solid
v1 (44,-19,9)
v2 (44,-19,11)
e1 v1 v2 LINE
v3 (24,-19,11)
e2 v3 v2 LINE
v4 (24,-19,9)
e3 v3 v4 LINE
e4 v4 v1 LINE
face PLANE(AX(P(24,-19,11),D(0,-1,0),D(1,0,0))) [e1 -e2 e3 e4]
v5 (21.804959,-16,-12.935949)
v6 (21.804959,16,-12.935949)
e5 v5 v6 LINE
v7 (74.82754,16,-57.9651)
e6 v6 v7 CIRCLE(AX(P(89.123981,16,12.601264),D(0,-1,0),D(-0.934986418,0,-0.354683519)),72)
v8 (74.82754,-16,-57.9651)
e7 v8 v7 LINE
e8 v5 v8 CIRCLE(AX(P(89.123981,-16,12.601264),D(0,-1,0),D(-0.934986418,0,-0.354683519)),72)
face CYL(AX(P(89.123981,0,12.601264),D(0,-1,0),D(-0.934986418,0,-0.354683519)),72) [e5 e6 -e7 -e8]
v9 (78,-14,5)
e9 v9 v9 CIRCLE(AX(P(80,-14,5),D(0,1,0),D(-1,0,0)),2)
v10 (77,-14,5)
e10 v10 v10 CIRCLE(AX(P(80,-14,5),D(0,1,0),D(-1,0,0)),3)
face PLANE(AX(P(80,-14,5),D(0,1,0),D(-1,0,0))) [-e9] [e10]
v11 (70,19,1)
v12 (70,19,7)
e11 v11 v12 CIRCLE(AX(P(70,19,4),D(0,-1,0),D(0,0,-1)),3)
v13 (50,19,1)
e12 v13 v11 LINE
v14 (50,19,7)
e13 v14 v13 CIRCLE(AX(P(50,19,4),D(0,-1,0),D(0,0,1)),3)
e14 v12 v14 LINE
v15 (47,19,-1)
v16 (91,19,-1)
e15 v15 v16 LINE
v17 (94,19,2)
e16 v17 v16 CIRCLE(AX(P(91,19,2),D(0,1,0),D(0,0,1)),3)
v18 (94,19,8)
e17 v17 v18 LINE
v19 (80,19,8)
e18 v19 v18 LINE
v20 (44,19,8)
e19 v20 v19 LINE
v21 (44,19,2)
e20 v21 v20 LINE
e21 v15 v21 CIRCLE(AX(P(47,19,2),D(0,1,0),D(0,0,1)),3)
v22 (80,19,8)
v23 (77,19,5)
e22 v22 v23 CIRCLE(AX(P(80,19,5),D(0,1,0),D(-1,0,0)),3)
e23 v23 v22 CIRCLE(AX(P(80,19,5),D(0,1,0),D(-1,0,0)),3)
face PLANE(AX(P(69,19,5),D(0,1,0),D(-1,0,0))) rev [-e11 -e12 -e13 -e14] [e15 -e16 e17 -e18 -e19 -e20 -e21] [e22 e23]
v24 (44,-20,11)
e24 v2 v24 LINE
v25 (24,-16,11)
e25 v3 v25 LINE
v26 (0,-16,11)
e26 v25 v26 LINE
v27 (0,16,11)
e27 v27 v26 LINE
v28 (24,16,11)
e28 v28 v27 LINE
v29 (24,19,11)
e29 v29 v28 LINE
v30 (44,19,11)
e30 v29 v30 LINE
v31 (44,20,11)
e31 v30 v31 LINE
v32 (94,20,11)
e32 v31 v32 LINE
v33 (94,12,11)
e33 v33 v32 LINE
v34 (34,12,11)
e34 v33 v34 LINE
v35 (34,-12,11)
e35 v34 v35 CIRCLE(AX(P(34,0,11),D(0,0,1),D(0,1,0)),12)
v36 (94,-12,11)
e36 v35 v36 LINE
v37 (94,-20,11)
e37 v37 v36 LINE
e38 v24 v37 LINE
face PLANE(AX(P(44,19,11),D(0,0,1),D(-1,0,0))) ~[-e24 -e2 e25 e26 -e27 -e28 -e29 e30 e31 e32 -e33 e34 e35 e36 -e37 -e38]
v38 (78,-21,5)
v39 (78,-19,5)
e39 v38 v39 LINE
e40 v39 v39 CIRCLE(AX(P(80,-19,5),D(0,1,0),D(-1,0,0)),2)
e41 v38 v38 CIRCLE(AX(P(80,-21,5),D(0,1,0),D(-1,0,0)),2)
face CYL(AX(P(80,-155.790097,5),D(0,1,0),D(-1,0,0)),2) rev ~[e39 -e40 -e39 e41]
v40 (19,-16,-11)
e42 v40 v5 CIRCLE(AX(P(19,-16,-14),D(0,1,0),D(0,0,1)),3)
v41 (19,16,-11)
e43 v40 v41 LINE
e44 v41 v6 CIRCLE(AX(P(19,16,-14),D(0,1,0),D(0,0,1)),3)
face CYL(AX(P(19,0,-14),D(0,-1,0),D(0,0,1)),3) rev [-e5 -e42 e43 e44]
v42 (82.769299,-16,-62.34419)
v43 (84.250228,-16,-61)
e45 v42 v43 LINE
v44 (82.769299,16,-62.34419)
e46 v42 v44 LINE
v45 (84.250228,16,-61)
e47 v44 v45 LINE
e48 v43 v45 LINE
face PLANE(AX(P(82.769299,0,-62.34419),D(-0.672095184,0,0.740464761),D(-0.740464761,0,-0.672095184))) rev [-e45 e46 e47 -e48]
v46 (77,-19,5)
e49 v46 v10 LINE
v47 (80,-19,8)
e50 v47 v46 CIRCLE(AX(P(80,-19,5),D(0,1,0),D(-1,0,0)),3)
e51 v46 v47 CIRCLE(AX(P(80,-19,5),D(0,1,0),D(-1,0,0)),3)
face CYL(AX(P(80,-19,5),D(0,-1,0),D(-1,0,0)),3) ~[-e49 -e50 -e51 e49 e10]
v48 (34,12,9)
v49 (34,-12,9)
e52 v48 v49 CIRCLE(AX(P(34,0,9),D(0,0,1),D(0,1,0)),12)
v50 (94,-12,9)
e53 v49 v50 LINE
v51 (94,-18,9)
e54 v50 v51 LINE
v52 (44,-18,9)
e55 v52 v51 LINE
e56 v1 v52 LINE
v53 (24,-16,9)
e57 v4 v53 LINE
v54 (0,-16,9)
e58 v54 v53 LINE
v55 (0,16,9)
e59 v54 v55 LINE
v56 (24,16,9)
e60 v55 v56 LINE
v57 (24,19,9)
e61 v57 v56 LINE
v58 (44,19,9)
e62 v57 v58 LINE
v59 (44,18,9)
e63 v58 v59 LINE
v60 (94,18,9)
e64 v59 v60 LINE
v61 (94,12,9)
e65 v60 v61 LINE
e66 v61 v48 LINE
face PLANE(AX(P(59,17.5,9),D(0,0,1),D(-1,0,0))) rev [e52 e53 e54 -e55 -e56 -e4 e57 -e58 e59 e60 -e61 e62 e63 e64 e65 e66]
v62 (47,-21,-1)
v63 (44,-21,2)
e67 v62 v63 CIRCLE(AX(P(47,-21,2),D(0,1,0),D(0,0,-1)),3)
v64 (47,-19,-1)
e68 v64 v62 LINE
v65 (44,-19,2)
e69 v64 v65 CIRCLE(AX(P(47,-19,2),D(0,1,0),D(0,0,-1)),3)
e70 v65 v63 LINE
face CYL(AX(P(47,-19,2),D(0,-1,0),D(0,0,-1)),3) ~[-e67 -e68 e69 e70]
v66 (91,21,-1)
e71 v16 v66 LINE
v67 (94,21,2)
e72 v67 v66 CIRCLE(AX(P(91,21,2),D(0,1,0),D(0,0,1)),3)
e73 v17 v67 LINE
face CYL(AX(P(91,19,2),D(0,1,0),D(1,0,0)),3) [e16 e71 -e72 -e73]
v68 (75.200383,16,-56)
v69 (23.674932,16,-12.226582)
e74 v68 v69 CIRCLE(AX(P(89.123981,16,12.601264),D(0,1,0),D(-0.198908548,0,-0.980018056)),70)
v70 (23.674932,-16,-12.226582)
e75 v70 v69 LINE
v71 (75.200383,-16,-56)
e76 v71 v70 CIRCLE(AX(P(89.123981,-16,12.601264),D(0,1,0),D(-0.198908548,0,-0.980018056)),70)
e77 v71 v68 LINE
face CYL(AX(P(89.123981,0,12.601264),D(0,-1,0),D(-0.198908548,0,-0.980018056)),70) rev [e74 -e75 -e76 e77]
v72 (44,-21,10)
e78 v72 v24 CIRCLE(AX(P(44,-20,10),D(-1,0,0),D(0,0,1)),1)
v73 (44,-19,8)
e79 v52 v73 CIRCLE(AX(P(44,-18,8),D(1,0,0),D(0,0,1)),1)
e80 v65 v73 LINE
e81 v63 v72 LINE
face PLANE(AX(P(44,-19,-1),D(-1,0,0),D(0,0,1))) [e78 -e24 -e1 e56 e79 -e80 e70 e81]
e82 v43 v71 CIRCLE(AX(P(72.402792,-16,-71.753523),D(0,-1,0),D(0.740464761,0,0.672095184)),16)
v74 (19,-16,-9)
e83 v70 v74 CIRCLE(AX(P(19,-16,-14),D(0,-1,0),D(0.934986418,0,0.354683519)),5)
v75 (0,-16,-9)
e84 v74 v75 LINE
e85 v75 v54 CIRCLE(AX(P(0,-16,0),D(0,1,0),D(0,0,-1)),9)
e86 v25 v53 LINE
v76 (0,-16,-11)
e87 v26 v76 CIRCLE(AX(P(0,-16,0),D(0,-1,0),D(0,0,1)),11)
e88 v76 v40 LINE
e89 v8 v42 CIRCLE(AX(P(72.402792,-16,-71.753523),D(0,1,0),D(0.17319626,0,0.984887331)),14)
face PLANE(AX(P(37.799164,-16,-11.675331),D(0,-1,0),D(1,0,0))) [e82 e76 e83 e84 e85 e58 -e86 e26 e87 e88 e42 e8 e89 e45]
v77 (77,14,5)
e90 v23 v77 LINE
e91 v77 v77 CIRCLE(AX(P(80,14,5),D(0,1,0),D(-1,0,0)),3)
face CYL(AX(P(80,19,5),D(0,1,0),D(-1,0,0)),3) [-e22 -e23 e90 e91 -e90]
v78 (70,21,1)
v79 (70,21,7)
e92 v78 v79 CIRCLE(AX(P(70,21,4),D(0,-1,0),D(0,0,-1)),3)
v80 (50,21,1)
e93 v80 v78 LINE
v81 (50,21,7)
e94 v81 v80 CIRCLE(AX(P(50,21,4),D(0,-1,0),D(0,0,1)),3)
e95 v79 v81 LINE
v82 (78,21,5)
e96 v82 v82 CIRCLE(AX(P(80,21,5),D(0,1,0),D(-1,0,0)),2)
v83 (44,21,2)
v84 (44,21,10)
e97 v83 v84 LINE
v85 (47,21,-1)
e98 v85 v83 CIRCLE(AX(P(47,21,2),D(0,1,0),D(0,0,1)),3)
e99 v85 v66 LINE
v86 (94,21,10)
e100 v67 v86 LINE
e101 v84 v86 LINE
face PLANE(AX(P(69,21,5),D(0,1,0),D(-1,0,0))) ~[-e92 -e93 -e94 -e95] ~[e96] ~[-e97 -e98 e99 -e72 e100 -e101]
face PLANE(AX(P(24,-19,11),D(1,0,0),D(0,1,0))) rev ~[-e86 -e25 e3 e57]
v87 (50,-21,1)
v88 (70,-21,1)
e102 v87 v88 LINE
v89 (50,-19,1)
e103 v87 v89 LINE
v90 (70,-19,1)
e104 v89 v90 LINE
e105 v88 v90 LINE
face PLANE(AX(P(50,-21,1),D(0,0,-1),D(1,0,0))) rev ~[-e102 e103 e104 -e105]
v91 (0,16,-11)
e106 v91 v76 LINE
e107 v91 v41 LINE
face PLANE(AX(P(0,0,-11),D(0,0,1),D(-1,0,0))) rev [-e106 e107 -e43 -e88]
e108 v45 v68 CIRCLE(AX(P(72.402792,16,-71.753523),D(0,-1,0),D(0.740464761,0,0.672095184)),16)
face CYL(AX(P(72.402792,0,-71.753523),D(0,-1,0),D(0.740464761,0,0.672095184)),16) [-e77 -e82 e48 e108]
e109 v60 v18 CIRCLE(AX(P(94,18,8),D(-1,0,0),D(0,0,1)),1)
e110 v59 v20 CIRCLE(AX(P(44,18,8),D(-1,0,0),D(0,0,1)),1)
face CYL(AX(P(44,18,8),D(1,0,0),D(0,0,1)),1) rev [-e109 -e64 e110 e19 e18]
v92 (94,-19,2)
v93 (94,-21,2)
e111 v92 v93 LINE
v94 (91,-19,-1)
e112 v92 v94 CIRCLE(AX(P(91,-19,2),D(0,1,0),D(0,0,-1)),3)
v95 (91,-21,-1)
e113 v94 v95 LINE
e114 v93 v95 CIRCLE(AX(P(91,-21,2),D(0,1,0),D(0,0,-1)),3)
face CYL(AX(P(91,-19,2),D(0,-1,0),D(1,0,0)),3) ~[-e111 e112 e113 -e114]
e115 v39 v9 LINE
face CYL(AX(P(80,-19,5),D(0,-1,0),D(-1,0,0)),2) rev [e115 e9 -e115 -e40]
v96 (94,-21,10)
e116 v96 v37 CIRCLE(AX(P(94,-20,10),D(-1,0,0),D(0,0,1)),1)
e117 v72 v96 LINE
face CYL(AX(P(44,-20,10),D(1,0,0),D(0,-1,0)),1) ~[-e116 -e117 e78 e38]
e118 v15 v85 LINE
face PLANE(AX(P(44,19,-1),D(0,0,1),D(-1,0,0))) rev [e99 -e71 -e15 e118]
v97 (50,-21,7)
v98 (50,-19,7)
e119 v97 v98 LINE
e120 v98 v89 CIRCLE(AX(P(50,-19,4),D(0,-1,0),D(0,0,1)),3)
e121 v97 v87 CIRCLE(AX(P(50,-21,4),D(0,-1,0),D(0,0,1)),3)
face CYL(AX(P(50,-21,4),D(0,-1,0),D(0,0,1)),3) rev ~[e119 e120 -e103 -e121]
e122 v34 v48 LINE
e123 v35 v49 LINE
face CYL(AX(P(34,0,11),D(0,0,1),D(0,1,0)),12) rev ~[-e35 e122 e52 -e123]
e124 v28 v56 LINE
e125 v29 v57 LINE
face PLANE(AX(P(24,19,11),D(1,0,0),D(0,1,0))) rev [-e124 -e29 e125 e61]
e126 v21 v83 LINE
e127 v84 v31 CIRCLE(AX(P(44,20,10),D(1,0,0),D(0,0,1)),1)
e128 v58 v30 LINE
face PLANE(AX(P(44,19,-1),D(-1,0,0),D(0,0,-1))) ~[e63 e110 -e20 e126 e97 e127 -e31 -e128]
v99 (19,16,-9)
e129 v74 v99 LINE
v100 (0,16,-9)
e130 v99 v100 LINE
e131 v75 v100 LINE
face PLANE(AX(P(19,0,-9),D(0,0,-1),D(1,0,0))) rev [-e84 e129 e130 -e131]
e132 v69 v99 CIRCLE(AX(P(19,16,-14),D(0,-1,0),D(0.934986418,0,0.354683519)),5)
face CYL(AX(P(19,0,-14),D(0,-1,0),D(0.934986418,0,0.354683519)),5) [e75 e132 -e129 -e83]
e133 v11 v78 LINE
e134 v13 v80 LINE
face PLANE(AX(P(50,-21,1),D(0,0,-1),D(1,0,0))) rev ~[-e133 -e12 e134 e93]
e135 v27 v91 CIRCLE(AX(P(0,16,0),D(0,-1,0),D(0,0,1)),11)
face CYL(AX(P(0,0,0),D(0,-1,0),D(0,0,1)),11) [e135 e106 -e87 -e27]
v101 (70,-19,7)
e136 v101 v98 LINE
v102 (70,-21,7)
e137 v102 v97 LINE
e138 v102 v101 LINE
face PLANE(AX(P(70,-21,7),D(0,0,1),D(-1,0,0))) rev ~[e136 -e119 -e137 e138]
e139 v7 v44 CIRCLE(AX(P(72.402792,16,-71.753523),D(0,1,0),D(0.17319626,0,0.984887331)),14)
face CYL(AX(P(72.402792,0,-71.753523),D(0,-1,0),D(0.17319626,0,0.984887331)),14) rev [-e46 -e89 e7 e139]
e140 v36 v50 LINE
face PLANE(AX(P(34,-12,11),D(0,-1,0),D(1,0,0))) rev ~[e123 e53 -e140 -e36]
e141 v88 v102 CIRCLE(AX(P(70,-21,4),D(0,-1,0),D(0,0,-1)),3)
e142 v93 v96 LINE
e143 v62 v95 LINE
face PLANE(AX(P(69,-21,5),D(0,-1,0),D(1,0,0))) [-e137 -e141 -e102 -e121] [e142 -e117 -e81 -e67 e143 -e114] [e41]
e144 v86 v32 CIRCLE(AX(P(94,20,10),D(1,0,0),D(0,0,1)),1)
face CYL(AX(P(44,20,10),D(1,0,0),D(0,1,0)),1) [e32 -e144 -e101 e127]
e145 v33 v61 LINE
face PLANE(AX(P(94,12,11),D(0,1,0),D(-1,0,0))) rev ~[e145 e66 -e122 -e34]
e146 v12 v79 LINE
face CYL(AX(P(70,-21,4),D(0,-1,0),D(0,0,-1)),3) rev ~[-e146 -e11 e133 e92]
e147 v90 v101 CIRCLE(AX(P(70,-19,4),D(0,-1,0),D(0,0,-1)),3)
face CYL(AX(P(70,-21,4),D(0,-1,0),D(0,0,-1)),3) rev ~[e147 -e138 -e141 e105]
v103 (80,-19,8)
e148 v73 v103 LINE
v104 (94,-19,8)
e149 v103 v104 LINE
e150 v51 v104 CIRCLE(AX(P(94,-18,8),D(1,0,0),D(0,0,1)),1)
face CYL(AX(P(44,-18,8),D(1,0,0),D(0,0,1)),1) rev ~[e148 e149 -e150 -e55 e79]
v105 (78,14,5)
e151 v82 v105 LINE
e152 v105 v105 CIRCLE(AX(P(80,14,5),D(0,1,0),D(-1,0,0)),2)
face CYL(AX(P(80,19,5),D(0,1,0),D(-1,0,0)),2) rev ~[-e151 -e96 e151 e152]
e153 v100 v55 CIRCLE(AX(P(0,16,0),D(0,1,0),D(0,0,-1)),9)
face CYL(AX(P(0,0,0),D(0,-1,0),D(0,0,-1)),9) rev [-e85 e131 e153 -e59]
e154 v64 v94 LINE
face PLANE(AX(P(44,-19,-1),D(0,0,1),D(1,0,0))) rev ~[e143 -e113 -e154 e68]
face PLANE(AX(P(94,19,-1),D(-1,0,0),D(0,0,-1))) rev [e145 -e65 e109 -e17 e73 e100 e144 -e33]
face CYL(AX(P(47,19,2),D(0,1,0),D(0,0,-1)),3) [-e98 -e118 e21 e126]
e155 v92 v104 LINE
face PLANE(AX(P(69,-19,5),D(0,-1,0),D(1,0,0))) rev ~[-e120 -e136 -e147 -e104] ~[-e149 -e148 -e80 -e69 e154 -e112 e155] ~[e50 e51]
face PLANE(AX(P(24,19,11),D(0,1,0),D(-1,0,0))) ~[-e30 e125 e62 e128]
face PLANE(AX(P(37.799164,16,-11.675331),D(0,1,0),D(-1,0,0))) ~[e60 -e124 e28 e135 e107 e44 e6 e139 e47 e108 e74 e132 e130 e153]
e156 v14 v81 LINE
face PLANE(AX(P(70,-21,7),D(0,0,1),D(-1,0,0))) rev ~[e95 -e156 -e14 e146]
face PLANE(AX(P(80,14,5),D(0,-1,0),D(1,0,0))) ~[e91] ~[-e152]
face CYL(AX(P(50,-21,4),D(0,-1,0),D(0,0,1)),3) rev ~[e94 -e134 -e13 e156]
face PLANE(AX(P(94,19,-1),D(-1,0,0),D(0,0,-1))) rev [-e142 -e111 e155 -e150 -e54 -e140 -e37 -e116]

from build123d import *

# Parameters (mm, degrees)
F1_DEPTH  = 16
F2_W      = 70
F2_H      = 3
F3_DEPTH  = 2
F4_W      = 50
F4_H      = 12
F5_DEPTH  = 2
F6_R      = 1
F9_DEPTH  = 2
F11_DEPTH = 42.001
F13_D     = 4
F14_R     = 3
F14_R_2   = 2
F15_DEPTH = 5
F16_R     = 3


# Not quite as in the source:
# - a pattern or mirror of a feature is missing from the dataset's text; its kind, count and spacing are read off the source's solid


with BuildPart() as f1:
    # F0 (on Front) → F1 (new body)
    with BuildSketch(Plane.XZ):
        with BuildLine():
            ThreePointArc((0, -9), (-9, 0), (0, 9))
            Line((0, 9), (94, 9))
            Line((94, 9), (94, 11))
            Line((94, 11), (0, 11))
            ThreePointArc((0, 11), (-11, 0), (0, -11))
            Line((0, -11), (19, -11))
            ThreePointArc((19, -11), (20.704090422, -11.530976745), (21.8049592536, -12.9359494441))
            ThreePointArc((21.8049592536, -12.9359494441), (42.5173607247, -42.2788136793), (74.8275397389, -57.9651003113))
            ThreePointArc((74.8275397389, -57.9651003113), (79.1628330842, -59.4937576212), (82.7692987656, -62.344190369))
            Line((82.7692987656, -62.344190369), (84.2502282886, -61))
            ThreePointArc((84.2502282886, -61), (80.1403113626, -57.7488524545), (75.200382963, -56))
            ThreePointArc((75.200382963, -56), (43.8025480023, -40.74634786), (23.6749320894, -12.2265824069))
            ThreePointArc((23.6749320894, -12.2265824069), (21.8401507033, -9.8849612416), (19, -9))
            Line((19, -9), (0, -9))
        make_face()
    extrude(amount=F1_DEPTH)

    # F2 (on face) → F3 (join)
    with BuildSketch(Plane.XY.offset(11)):
        with Locations((59, -17.5)):
            Rectangle(F2_W, F2_H)
    extrude(amount=-F3_DEPTH)

    # F4 (on face) → F5 (join)
    with BuildSketch(Plane.XZ.offset(19)):
        with Locations((69, 5)):
            Rectangle(F4_W, F4_H)
    extrude(amount=F5_DEPTH)

    # F6
    f6_edges = [f1.edges().sort_by_distance(p)[0] for p in [
        (69, -21, 11),
        (69, -19, 9),
    ]]
    fillet(f6_edges, radius=F6_R)

    # F7: F1 across plane


with BuildPart() as f1_1:
    add(f1.part)
    add(f1.part.mirror(Plane.XZ))

    # F8 (on face) → F9 (cut)
    with BuildSketch(Plane.XY.offset(11)):
        with BuildLine():
            Line((94, 12), (34, 12))
            ThreePointArc((34, 12), (22, 0), (34, -12))
            Line((34, -12), (94, -12))
            Line((94, -12), (94, 12))
        make_face()
    extrude(amount=-F9_DEPTH, mode=Mode.SUBTRACT)

    # F10 (on face) → F11 (cut, through all)
    with BuildSketch(Plane.XZ.offset(21)):
        with BuildLine():
            ThreePointArc((50, 7), (47, 4), (50, 1))
            Line((50, 1), (70, 1))
            ThreePointArc((70, 1), (73, 4), (70, 7))
            Line((70, 7), (50, 7))
        make_face()
    extrude(amount=-F11_DEPTH, mode=Mode.SUBTRACT)

    # F13 (through all)
    with Locations(Plane.XZ.offset(21)):
        with Locations((80, 5)):
            Hole(F13_D / 2)

    # F14 (on face) → F15 (join)
    with BuildSketch(Plane(origin=(0, -19, 0), x_dir=(-1, 0, 0), z_dir=(0, 1, 0))):
        with Locations((-80, 5)):
            Circle(F14_R)
        with Locations((-80, 5)):
            Circle(F14_R_2, mode=Mode.SUBTRACT)
    f15 = extrude(amount=F15_DEPTH)

    # F15_copies: F15 across plane
    add(f15.mirror(Plane.ZX))

    # F16
    f16_edges = [f1_1.edges().sort_by_distance(p)[0] for p in [
        (94, -20, -1),
        (94, 20, -1),
        (44, 20, -1),
        (44, -20, -1),
    ]]
    fillet(f16_edges, radius=F16_R)


solid = f1_1.part
